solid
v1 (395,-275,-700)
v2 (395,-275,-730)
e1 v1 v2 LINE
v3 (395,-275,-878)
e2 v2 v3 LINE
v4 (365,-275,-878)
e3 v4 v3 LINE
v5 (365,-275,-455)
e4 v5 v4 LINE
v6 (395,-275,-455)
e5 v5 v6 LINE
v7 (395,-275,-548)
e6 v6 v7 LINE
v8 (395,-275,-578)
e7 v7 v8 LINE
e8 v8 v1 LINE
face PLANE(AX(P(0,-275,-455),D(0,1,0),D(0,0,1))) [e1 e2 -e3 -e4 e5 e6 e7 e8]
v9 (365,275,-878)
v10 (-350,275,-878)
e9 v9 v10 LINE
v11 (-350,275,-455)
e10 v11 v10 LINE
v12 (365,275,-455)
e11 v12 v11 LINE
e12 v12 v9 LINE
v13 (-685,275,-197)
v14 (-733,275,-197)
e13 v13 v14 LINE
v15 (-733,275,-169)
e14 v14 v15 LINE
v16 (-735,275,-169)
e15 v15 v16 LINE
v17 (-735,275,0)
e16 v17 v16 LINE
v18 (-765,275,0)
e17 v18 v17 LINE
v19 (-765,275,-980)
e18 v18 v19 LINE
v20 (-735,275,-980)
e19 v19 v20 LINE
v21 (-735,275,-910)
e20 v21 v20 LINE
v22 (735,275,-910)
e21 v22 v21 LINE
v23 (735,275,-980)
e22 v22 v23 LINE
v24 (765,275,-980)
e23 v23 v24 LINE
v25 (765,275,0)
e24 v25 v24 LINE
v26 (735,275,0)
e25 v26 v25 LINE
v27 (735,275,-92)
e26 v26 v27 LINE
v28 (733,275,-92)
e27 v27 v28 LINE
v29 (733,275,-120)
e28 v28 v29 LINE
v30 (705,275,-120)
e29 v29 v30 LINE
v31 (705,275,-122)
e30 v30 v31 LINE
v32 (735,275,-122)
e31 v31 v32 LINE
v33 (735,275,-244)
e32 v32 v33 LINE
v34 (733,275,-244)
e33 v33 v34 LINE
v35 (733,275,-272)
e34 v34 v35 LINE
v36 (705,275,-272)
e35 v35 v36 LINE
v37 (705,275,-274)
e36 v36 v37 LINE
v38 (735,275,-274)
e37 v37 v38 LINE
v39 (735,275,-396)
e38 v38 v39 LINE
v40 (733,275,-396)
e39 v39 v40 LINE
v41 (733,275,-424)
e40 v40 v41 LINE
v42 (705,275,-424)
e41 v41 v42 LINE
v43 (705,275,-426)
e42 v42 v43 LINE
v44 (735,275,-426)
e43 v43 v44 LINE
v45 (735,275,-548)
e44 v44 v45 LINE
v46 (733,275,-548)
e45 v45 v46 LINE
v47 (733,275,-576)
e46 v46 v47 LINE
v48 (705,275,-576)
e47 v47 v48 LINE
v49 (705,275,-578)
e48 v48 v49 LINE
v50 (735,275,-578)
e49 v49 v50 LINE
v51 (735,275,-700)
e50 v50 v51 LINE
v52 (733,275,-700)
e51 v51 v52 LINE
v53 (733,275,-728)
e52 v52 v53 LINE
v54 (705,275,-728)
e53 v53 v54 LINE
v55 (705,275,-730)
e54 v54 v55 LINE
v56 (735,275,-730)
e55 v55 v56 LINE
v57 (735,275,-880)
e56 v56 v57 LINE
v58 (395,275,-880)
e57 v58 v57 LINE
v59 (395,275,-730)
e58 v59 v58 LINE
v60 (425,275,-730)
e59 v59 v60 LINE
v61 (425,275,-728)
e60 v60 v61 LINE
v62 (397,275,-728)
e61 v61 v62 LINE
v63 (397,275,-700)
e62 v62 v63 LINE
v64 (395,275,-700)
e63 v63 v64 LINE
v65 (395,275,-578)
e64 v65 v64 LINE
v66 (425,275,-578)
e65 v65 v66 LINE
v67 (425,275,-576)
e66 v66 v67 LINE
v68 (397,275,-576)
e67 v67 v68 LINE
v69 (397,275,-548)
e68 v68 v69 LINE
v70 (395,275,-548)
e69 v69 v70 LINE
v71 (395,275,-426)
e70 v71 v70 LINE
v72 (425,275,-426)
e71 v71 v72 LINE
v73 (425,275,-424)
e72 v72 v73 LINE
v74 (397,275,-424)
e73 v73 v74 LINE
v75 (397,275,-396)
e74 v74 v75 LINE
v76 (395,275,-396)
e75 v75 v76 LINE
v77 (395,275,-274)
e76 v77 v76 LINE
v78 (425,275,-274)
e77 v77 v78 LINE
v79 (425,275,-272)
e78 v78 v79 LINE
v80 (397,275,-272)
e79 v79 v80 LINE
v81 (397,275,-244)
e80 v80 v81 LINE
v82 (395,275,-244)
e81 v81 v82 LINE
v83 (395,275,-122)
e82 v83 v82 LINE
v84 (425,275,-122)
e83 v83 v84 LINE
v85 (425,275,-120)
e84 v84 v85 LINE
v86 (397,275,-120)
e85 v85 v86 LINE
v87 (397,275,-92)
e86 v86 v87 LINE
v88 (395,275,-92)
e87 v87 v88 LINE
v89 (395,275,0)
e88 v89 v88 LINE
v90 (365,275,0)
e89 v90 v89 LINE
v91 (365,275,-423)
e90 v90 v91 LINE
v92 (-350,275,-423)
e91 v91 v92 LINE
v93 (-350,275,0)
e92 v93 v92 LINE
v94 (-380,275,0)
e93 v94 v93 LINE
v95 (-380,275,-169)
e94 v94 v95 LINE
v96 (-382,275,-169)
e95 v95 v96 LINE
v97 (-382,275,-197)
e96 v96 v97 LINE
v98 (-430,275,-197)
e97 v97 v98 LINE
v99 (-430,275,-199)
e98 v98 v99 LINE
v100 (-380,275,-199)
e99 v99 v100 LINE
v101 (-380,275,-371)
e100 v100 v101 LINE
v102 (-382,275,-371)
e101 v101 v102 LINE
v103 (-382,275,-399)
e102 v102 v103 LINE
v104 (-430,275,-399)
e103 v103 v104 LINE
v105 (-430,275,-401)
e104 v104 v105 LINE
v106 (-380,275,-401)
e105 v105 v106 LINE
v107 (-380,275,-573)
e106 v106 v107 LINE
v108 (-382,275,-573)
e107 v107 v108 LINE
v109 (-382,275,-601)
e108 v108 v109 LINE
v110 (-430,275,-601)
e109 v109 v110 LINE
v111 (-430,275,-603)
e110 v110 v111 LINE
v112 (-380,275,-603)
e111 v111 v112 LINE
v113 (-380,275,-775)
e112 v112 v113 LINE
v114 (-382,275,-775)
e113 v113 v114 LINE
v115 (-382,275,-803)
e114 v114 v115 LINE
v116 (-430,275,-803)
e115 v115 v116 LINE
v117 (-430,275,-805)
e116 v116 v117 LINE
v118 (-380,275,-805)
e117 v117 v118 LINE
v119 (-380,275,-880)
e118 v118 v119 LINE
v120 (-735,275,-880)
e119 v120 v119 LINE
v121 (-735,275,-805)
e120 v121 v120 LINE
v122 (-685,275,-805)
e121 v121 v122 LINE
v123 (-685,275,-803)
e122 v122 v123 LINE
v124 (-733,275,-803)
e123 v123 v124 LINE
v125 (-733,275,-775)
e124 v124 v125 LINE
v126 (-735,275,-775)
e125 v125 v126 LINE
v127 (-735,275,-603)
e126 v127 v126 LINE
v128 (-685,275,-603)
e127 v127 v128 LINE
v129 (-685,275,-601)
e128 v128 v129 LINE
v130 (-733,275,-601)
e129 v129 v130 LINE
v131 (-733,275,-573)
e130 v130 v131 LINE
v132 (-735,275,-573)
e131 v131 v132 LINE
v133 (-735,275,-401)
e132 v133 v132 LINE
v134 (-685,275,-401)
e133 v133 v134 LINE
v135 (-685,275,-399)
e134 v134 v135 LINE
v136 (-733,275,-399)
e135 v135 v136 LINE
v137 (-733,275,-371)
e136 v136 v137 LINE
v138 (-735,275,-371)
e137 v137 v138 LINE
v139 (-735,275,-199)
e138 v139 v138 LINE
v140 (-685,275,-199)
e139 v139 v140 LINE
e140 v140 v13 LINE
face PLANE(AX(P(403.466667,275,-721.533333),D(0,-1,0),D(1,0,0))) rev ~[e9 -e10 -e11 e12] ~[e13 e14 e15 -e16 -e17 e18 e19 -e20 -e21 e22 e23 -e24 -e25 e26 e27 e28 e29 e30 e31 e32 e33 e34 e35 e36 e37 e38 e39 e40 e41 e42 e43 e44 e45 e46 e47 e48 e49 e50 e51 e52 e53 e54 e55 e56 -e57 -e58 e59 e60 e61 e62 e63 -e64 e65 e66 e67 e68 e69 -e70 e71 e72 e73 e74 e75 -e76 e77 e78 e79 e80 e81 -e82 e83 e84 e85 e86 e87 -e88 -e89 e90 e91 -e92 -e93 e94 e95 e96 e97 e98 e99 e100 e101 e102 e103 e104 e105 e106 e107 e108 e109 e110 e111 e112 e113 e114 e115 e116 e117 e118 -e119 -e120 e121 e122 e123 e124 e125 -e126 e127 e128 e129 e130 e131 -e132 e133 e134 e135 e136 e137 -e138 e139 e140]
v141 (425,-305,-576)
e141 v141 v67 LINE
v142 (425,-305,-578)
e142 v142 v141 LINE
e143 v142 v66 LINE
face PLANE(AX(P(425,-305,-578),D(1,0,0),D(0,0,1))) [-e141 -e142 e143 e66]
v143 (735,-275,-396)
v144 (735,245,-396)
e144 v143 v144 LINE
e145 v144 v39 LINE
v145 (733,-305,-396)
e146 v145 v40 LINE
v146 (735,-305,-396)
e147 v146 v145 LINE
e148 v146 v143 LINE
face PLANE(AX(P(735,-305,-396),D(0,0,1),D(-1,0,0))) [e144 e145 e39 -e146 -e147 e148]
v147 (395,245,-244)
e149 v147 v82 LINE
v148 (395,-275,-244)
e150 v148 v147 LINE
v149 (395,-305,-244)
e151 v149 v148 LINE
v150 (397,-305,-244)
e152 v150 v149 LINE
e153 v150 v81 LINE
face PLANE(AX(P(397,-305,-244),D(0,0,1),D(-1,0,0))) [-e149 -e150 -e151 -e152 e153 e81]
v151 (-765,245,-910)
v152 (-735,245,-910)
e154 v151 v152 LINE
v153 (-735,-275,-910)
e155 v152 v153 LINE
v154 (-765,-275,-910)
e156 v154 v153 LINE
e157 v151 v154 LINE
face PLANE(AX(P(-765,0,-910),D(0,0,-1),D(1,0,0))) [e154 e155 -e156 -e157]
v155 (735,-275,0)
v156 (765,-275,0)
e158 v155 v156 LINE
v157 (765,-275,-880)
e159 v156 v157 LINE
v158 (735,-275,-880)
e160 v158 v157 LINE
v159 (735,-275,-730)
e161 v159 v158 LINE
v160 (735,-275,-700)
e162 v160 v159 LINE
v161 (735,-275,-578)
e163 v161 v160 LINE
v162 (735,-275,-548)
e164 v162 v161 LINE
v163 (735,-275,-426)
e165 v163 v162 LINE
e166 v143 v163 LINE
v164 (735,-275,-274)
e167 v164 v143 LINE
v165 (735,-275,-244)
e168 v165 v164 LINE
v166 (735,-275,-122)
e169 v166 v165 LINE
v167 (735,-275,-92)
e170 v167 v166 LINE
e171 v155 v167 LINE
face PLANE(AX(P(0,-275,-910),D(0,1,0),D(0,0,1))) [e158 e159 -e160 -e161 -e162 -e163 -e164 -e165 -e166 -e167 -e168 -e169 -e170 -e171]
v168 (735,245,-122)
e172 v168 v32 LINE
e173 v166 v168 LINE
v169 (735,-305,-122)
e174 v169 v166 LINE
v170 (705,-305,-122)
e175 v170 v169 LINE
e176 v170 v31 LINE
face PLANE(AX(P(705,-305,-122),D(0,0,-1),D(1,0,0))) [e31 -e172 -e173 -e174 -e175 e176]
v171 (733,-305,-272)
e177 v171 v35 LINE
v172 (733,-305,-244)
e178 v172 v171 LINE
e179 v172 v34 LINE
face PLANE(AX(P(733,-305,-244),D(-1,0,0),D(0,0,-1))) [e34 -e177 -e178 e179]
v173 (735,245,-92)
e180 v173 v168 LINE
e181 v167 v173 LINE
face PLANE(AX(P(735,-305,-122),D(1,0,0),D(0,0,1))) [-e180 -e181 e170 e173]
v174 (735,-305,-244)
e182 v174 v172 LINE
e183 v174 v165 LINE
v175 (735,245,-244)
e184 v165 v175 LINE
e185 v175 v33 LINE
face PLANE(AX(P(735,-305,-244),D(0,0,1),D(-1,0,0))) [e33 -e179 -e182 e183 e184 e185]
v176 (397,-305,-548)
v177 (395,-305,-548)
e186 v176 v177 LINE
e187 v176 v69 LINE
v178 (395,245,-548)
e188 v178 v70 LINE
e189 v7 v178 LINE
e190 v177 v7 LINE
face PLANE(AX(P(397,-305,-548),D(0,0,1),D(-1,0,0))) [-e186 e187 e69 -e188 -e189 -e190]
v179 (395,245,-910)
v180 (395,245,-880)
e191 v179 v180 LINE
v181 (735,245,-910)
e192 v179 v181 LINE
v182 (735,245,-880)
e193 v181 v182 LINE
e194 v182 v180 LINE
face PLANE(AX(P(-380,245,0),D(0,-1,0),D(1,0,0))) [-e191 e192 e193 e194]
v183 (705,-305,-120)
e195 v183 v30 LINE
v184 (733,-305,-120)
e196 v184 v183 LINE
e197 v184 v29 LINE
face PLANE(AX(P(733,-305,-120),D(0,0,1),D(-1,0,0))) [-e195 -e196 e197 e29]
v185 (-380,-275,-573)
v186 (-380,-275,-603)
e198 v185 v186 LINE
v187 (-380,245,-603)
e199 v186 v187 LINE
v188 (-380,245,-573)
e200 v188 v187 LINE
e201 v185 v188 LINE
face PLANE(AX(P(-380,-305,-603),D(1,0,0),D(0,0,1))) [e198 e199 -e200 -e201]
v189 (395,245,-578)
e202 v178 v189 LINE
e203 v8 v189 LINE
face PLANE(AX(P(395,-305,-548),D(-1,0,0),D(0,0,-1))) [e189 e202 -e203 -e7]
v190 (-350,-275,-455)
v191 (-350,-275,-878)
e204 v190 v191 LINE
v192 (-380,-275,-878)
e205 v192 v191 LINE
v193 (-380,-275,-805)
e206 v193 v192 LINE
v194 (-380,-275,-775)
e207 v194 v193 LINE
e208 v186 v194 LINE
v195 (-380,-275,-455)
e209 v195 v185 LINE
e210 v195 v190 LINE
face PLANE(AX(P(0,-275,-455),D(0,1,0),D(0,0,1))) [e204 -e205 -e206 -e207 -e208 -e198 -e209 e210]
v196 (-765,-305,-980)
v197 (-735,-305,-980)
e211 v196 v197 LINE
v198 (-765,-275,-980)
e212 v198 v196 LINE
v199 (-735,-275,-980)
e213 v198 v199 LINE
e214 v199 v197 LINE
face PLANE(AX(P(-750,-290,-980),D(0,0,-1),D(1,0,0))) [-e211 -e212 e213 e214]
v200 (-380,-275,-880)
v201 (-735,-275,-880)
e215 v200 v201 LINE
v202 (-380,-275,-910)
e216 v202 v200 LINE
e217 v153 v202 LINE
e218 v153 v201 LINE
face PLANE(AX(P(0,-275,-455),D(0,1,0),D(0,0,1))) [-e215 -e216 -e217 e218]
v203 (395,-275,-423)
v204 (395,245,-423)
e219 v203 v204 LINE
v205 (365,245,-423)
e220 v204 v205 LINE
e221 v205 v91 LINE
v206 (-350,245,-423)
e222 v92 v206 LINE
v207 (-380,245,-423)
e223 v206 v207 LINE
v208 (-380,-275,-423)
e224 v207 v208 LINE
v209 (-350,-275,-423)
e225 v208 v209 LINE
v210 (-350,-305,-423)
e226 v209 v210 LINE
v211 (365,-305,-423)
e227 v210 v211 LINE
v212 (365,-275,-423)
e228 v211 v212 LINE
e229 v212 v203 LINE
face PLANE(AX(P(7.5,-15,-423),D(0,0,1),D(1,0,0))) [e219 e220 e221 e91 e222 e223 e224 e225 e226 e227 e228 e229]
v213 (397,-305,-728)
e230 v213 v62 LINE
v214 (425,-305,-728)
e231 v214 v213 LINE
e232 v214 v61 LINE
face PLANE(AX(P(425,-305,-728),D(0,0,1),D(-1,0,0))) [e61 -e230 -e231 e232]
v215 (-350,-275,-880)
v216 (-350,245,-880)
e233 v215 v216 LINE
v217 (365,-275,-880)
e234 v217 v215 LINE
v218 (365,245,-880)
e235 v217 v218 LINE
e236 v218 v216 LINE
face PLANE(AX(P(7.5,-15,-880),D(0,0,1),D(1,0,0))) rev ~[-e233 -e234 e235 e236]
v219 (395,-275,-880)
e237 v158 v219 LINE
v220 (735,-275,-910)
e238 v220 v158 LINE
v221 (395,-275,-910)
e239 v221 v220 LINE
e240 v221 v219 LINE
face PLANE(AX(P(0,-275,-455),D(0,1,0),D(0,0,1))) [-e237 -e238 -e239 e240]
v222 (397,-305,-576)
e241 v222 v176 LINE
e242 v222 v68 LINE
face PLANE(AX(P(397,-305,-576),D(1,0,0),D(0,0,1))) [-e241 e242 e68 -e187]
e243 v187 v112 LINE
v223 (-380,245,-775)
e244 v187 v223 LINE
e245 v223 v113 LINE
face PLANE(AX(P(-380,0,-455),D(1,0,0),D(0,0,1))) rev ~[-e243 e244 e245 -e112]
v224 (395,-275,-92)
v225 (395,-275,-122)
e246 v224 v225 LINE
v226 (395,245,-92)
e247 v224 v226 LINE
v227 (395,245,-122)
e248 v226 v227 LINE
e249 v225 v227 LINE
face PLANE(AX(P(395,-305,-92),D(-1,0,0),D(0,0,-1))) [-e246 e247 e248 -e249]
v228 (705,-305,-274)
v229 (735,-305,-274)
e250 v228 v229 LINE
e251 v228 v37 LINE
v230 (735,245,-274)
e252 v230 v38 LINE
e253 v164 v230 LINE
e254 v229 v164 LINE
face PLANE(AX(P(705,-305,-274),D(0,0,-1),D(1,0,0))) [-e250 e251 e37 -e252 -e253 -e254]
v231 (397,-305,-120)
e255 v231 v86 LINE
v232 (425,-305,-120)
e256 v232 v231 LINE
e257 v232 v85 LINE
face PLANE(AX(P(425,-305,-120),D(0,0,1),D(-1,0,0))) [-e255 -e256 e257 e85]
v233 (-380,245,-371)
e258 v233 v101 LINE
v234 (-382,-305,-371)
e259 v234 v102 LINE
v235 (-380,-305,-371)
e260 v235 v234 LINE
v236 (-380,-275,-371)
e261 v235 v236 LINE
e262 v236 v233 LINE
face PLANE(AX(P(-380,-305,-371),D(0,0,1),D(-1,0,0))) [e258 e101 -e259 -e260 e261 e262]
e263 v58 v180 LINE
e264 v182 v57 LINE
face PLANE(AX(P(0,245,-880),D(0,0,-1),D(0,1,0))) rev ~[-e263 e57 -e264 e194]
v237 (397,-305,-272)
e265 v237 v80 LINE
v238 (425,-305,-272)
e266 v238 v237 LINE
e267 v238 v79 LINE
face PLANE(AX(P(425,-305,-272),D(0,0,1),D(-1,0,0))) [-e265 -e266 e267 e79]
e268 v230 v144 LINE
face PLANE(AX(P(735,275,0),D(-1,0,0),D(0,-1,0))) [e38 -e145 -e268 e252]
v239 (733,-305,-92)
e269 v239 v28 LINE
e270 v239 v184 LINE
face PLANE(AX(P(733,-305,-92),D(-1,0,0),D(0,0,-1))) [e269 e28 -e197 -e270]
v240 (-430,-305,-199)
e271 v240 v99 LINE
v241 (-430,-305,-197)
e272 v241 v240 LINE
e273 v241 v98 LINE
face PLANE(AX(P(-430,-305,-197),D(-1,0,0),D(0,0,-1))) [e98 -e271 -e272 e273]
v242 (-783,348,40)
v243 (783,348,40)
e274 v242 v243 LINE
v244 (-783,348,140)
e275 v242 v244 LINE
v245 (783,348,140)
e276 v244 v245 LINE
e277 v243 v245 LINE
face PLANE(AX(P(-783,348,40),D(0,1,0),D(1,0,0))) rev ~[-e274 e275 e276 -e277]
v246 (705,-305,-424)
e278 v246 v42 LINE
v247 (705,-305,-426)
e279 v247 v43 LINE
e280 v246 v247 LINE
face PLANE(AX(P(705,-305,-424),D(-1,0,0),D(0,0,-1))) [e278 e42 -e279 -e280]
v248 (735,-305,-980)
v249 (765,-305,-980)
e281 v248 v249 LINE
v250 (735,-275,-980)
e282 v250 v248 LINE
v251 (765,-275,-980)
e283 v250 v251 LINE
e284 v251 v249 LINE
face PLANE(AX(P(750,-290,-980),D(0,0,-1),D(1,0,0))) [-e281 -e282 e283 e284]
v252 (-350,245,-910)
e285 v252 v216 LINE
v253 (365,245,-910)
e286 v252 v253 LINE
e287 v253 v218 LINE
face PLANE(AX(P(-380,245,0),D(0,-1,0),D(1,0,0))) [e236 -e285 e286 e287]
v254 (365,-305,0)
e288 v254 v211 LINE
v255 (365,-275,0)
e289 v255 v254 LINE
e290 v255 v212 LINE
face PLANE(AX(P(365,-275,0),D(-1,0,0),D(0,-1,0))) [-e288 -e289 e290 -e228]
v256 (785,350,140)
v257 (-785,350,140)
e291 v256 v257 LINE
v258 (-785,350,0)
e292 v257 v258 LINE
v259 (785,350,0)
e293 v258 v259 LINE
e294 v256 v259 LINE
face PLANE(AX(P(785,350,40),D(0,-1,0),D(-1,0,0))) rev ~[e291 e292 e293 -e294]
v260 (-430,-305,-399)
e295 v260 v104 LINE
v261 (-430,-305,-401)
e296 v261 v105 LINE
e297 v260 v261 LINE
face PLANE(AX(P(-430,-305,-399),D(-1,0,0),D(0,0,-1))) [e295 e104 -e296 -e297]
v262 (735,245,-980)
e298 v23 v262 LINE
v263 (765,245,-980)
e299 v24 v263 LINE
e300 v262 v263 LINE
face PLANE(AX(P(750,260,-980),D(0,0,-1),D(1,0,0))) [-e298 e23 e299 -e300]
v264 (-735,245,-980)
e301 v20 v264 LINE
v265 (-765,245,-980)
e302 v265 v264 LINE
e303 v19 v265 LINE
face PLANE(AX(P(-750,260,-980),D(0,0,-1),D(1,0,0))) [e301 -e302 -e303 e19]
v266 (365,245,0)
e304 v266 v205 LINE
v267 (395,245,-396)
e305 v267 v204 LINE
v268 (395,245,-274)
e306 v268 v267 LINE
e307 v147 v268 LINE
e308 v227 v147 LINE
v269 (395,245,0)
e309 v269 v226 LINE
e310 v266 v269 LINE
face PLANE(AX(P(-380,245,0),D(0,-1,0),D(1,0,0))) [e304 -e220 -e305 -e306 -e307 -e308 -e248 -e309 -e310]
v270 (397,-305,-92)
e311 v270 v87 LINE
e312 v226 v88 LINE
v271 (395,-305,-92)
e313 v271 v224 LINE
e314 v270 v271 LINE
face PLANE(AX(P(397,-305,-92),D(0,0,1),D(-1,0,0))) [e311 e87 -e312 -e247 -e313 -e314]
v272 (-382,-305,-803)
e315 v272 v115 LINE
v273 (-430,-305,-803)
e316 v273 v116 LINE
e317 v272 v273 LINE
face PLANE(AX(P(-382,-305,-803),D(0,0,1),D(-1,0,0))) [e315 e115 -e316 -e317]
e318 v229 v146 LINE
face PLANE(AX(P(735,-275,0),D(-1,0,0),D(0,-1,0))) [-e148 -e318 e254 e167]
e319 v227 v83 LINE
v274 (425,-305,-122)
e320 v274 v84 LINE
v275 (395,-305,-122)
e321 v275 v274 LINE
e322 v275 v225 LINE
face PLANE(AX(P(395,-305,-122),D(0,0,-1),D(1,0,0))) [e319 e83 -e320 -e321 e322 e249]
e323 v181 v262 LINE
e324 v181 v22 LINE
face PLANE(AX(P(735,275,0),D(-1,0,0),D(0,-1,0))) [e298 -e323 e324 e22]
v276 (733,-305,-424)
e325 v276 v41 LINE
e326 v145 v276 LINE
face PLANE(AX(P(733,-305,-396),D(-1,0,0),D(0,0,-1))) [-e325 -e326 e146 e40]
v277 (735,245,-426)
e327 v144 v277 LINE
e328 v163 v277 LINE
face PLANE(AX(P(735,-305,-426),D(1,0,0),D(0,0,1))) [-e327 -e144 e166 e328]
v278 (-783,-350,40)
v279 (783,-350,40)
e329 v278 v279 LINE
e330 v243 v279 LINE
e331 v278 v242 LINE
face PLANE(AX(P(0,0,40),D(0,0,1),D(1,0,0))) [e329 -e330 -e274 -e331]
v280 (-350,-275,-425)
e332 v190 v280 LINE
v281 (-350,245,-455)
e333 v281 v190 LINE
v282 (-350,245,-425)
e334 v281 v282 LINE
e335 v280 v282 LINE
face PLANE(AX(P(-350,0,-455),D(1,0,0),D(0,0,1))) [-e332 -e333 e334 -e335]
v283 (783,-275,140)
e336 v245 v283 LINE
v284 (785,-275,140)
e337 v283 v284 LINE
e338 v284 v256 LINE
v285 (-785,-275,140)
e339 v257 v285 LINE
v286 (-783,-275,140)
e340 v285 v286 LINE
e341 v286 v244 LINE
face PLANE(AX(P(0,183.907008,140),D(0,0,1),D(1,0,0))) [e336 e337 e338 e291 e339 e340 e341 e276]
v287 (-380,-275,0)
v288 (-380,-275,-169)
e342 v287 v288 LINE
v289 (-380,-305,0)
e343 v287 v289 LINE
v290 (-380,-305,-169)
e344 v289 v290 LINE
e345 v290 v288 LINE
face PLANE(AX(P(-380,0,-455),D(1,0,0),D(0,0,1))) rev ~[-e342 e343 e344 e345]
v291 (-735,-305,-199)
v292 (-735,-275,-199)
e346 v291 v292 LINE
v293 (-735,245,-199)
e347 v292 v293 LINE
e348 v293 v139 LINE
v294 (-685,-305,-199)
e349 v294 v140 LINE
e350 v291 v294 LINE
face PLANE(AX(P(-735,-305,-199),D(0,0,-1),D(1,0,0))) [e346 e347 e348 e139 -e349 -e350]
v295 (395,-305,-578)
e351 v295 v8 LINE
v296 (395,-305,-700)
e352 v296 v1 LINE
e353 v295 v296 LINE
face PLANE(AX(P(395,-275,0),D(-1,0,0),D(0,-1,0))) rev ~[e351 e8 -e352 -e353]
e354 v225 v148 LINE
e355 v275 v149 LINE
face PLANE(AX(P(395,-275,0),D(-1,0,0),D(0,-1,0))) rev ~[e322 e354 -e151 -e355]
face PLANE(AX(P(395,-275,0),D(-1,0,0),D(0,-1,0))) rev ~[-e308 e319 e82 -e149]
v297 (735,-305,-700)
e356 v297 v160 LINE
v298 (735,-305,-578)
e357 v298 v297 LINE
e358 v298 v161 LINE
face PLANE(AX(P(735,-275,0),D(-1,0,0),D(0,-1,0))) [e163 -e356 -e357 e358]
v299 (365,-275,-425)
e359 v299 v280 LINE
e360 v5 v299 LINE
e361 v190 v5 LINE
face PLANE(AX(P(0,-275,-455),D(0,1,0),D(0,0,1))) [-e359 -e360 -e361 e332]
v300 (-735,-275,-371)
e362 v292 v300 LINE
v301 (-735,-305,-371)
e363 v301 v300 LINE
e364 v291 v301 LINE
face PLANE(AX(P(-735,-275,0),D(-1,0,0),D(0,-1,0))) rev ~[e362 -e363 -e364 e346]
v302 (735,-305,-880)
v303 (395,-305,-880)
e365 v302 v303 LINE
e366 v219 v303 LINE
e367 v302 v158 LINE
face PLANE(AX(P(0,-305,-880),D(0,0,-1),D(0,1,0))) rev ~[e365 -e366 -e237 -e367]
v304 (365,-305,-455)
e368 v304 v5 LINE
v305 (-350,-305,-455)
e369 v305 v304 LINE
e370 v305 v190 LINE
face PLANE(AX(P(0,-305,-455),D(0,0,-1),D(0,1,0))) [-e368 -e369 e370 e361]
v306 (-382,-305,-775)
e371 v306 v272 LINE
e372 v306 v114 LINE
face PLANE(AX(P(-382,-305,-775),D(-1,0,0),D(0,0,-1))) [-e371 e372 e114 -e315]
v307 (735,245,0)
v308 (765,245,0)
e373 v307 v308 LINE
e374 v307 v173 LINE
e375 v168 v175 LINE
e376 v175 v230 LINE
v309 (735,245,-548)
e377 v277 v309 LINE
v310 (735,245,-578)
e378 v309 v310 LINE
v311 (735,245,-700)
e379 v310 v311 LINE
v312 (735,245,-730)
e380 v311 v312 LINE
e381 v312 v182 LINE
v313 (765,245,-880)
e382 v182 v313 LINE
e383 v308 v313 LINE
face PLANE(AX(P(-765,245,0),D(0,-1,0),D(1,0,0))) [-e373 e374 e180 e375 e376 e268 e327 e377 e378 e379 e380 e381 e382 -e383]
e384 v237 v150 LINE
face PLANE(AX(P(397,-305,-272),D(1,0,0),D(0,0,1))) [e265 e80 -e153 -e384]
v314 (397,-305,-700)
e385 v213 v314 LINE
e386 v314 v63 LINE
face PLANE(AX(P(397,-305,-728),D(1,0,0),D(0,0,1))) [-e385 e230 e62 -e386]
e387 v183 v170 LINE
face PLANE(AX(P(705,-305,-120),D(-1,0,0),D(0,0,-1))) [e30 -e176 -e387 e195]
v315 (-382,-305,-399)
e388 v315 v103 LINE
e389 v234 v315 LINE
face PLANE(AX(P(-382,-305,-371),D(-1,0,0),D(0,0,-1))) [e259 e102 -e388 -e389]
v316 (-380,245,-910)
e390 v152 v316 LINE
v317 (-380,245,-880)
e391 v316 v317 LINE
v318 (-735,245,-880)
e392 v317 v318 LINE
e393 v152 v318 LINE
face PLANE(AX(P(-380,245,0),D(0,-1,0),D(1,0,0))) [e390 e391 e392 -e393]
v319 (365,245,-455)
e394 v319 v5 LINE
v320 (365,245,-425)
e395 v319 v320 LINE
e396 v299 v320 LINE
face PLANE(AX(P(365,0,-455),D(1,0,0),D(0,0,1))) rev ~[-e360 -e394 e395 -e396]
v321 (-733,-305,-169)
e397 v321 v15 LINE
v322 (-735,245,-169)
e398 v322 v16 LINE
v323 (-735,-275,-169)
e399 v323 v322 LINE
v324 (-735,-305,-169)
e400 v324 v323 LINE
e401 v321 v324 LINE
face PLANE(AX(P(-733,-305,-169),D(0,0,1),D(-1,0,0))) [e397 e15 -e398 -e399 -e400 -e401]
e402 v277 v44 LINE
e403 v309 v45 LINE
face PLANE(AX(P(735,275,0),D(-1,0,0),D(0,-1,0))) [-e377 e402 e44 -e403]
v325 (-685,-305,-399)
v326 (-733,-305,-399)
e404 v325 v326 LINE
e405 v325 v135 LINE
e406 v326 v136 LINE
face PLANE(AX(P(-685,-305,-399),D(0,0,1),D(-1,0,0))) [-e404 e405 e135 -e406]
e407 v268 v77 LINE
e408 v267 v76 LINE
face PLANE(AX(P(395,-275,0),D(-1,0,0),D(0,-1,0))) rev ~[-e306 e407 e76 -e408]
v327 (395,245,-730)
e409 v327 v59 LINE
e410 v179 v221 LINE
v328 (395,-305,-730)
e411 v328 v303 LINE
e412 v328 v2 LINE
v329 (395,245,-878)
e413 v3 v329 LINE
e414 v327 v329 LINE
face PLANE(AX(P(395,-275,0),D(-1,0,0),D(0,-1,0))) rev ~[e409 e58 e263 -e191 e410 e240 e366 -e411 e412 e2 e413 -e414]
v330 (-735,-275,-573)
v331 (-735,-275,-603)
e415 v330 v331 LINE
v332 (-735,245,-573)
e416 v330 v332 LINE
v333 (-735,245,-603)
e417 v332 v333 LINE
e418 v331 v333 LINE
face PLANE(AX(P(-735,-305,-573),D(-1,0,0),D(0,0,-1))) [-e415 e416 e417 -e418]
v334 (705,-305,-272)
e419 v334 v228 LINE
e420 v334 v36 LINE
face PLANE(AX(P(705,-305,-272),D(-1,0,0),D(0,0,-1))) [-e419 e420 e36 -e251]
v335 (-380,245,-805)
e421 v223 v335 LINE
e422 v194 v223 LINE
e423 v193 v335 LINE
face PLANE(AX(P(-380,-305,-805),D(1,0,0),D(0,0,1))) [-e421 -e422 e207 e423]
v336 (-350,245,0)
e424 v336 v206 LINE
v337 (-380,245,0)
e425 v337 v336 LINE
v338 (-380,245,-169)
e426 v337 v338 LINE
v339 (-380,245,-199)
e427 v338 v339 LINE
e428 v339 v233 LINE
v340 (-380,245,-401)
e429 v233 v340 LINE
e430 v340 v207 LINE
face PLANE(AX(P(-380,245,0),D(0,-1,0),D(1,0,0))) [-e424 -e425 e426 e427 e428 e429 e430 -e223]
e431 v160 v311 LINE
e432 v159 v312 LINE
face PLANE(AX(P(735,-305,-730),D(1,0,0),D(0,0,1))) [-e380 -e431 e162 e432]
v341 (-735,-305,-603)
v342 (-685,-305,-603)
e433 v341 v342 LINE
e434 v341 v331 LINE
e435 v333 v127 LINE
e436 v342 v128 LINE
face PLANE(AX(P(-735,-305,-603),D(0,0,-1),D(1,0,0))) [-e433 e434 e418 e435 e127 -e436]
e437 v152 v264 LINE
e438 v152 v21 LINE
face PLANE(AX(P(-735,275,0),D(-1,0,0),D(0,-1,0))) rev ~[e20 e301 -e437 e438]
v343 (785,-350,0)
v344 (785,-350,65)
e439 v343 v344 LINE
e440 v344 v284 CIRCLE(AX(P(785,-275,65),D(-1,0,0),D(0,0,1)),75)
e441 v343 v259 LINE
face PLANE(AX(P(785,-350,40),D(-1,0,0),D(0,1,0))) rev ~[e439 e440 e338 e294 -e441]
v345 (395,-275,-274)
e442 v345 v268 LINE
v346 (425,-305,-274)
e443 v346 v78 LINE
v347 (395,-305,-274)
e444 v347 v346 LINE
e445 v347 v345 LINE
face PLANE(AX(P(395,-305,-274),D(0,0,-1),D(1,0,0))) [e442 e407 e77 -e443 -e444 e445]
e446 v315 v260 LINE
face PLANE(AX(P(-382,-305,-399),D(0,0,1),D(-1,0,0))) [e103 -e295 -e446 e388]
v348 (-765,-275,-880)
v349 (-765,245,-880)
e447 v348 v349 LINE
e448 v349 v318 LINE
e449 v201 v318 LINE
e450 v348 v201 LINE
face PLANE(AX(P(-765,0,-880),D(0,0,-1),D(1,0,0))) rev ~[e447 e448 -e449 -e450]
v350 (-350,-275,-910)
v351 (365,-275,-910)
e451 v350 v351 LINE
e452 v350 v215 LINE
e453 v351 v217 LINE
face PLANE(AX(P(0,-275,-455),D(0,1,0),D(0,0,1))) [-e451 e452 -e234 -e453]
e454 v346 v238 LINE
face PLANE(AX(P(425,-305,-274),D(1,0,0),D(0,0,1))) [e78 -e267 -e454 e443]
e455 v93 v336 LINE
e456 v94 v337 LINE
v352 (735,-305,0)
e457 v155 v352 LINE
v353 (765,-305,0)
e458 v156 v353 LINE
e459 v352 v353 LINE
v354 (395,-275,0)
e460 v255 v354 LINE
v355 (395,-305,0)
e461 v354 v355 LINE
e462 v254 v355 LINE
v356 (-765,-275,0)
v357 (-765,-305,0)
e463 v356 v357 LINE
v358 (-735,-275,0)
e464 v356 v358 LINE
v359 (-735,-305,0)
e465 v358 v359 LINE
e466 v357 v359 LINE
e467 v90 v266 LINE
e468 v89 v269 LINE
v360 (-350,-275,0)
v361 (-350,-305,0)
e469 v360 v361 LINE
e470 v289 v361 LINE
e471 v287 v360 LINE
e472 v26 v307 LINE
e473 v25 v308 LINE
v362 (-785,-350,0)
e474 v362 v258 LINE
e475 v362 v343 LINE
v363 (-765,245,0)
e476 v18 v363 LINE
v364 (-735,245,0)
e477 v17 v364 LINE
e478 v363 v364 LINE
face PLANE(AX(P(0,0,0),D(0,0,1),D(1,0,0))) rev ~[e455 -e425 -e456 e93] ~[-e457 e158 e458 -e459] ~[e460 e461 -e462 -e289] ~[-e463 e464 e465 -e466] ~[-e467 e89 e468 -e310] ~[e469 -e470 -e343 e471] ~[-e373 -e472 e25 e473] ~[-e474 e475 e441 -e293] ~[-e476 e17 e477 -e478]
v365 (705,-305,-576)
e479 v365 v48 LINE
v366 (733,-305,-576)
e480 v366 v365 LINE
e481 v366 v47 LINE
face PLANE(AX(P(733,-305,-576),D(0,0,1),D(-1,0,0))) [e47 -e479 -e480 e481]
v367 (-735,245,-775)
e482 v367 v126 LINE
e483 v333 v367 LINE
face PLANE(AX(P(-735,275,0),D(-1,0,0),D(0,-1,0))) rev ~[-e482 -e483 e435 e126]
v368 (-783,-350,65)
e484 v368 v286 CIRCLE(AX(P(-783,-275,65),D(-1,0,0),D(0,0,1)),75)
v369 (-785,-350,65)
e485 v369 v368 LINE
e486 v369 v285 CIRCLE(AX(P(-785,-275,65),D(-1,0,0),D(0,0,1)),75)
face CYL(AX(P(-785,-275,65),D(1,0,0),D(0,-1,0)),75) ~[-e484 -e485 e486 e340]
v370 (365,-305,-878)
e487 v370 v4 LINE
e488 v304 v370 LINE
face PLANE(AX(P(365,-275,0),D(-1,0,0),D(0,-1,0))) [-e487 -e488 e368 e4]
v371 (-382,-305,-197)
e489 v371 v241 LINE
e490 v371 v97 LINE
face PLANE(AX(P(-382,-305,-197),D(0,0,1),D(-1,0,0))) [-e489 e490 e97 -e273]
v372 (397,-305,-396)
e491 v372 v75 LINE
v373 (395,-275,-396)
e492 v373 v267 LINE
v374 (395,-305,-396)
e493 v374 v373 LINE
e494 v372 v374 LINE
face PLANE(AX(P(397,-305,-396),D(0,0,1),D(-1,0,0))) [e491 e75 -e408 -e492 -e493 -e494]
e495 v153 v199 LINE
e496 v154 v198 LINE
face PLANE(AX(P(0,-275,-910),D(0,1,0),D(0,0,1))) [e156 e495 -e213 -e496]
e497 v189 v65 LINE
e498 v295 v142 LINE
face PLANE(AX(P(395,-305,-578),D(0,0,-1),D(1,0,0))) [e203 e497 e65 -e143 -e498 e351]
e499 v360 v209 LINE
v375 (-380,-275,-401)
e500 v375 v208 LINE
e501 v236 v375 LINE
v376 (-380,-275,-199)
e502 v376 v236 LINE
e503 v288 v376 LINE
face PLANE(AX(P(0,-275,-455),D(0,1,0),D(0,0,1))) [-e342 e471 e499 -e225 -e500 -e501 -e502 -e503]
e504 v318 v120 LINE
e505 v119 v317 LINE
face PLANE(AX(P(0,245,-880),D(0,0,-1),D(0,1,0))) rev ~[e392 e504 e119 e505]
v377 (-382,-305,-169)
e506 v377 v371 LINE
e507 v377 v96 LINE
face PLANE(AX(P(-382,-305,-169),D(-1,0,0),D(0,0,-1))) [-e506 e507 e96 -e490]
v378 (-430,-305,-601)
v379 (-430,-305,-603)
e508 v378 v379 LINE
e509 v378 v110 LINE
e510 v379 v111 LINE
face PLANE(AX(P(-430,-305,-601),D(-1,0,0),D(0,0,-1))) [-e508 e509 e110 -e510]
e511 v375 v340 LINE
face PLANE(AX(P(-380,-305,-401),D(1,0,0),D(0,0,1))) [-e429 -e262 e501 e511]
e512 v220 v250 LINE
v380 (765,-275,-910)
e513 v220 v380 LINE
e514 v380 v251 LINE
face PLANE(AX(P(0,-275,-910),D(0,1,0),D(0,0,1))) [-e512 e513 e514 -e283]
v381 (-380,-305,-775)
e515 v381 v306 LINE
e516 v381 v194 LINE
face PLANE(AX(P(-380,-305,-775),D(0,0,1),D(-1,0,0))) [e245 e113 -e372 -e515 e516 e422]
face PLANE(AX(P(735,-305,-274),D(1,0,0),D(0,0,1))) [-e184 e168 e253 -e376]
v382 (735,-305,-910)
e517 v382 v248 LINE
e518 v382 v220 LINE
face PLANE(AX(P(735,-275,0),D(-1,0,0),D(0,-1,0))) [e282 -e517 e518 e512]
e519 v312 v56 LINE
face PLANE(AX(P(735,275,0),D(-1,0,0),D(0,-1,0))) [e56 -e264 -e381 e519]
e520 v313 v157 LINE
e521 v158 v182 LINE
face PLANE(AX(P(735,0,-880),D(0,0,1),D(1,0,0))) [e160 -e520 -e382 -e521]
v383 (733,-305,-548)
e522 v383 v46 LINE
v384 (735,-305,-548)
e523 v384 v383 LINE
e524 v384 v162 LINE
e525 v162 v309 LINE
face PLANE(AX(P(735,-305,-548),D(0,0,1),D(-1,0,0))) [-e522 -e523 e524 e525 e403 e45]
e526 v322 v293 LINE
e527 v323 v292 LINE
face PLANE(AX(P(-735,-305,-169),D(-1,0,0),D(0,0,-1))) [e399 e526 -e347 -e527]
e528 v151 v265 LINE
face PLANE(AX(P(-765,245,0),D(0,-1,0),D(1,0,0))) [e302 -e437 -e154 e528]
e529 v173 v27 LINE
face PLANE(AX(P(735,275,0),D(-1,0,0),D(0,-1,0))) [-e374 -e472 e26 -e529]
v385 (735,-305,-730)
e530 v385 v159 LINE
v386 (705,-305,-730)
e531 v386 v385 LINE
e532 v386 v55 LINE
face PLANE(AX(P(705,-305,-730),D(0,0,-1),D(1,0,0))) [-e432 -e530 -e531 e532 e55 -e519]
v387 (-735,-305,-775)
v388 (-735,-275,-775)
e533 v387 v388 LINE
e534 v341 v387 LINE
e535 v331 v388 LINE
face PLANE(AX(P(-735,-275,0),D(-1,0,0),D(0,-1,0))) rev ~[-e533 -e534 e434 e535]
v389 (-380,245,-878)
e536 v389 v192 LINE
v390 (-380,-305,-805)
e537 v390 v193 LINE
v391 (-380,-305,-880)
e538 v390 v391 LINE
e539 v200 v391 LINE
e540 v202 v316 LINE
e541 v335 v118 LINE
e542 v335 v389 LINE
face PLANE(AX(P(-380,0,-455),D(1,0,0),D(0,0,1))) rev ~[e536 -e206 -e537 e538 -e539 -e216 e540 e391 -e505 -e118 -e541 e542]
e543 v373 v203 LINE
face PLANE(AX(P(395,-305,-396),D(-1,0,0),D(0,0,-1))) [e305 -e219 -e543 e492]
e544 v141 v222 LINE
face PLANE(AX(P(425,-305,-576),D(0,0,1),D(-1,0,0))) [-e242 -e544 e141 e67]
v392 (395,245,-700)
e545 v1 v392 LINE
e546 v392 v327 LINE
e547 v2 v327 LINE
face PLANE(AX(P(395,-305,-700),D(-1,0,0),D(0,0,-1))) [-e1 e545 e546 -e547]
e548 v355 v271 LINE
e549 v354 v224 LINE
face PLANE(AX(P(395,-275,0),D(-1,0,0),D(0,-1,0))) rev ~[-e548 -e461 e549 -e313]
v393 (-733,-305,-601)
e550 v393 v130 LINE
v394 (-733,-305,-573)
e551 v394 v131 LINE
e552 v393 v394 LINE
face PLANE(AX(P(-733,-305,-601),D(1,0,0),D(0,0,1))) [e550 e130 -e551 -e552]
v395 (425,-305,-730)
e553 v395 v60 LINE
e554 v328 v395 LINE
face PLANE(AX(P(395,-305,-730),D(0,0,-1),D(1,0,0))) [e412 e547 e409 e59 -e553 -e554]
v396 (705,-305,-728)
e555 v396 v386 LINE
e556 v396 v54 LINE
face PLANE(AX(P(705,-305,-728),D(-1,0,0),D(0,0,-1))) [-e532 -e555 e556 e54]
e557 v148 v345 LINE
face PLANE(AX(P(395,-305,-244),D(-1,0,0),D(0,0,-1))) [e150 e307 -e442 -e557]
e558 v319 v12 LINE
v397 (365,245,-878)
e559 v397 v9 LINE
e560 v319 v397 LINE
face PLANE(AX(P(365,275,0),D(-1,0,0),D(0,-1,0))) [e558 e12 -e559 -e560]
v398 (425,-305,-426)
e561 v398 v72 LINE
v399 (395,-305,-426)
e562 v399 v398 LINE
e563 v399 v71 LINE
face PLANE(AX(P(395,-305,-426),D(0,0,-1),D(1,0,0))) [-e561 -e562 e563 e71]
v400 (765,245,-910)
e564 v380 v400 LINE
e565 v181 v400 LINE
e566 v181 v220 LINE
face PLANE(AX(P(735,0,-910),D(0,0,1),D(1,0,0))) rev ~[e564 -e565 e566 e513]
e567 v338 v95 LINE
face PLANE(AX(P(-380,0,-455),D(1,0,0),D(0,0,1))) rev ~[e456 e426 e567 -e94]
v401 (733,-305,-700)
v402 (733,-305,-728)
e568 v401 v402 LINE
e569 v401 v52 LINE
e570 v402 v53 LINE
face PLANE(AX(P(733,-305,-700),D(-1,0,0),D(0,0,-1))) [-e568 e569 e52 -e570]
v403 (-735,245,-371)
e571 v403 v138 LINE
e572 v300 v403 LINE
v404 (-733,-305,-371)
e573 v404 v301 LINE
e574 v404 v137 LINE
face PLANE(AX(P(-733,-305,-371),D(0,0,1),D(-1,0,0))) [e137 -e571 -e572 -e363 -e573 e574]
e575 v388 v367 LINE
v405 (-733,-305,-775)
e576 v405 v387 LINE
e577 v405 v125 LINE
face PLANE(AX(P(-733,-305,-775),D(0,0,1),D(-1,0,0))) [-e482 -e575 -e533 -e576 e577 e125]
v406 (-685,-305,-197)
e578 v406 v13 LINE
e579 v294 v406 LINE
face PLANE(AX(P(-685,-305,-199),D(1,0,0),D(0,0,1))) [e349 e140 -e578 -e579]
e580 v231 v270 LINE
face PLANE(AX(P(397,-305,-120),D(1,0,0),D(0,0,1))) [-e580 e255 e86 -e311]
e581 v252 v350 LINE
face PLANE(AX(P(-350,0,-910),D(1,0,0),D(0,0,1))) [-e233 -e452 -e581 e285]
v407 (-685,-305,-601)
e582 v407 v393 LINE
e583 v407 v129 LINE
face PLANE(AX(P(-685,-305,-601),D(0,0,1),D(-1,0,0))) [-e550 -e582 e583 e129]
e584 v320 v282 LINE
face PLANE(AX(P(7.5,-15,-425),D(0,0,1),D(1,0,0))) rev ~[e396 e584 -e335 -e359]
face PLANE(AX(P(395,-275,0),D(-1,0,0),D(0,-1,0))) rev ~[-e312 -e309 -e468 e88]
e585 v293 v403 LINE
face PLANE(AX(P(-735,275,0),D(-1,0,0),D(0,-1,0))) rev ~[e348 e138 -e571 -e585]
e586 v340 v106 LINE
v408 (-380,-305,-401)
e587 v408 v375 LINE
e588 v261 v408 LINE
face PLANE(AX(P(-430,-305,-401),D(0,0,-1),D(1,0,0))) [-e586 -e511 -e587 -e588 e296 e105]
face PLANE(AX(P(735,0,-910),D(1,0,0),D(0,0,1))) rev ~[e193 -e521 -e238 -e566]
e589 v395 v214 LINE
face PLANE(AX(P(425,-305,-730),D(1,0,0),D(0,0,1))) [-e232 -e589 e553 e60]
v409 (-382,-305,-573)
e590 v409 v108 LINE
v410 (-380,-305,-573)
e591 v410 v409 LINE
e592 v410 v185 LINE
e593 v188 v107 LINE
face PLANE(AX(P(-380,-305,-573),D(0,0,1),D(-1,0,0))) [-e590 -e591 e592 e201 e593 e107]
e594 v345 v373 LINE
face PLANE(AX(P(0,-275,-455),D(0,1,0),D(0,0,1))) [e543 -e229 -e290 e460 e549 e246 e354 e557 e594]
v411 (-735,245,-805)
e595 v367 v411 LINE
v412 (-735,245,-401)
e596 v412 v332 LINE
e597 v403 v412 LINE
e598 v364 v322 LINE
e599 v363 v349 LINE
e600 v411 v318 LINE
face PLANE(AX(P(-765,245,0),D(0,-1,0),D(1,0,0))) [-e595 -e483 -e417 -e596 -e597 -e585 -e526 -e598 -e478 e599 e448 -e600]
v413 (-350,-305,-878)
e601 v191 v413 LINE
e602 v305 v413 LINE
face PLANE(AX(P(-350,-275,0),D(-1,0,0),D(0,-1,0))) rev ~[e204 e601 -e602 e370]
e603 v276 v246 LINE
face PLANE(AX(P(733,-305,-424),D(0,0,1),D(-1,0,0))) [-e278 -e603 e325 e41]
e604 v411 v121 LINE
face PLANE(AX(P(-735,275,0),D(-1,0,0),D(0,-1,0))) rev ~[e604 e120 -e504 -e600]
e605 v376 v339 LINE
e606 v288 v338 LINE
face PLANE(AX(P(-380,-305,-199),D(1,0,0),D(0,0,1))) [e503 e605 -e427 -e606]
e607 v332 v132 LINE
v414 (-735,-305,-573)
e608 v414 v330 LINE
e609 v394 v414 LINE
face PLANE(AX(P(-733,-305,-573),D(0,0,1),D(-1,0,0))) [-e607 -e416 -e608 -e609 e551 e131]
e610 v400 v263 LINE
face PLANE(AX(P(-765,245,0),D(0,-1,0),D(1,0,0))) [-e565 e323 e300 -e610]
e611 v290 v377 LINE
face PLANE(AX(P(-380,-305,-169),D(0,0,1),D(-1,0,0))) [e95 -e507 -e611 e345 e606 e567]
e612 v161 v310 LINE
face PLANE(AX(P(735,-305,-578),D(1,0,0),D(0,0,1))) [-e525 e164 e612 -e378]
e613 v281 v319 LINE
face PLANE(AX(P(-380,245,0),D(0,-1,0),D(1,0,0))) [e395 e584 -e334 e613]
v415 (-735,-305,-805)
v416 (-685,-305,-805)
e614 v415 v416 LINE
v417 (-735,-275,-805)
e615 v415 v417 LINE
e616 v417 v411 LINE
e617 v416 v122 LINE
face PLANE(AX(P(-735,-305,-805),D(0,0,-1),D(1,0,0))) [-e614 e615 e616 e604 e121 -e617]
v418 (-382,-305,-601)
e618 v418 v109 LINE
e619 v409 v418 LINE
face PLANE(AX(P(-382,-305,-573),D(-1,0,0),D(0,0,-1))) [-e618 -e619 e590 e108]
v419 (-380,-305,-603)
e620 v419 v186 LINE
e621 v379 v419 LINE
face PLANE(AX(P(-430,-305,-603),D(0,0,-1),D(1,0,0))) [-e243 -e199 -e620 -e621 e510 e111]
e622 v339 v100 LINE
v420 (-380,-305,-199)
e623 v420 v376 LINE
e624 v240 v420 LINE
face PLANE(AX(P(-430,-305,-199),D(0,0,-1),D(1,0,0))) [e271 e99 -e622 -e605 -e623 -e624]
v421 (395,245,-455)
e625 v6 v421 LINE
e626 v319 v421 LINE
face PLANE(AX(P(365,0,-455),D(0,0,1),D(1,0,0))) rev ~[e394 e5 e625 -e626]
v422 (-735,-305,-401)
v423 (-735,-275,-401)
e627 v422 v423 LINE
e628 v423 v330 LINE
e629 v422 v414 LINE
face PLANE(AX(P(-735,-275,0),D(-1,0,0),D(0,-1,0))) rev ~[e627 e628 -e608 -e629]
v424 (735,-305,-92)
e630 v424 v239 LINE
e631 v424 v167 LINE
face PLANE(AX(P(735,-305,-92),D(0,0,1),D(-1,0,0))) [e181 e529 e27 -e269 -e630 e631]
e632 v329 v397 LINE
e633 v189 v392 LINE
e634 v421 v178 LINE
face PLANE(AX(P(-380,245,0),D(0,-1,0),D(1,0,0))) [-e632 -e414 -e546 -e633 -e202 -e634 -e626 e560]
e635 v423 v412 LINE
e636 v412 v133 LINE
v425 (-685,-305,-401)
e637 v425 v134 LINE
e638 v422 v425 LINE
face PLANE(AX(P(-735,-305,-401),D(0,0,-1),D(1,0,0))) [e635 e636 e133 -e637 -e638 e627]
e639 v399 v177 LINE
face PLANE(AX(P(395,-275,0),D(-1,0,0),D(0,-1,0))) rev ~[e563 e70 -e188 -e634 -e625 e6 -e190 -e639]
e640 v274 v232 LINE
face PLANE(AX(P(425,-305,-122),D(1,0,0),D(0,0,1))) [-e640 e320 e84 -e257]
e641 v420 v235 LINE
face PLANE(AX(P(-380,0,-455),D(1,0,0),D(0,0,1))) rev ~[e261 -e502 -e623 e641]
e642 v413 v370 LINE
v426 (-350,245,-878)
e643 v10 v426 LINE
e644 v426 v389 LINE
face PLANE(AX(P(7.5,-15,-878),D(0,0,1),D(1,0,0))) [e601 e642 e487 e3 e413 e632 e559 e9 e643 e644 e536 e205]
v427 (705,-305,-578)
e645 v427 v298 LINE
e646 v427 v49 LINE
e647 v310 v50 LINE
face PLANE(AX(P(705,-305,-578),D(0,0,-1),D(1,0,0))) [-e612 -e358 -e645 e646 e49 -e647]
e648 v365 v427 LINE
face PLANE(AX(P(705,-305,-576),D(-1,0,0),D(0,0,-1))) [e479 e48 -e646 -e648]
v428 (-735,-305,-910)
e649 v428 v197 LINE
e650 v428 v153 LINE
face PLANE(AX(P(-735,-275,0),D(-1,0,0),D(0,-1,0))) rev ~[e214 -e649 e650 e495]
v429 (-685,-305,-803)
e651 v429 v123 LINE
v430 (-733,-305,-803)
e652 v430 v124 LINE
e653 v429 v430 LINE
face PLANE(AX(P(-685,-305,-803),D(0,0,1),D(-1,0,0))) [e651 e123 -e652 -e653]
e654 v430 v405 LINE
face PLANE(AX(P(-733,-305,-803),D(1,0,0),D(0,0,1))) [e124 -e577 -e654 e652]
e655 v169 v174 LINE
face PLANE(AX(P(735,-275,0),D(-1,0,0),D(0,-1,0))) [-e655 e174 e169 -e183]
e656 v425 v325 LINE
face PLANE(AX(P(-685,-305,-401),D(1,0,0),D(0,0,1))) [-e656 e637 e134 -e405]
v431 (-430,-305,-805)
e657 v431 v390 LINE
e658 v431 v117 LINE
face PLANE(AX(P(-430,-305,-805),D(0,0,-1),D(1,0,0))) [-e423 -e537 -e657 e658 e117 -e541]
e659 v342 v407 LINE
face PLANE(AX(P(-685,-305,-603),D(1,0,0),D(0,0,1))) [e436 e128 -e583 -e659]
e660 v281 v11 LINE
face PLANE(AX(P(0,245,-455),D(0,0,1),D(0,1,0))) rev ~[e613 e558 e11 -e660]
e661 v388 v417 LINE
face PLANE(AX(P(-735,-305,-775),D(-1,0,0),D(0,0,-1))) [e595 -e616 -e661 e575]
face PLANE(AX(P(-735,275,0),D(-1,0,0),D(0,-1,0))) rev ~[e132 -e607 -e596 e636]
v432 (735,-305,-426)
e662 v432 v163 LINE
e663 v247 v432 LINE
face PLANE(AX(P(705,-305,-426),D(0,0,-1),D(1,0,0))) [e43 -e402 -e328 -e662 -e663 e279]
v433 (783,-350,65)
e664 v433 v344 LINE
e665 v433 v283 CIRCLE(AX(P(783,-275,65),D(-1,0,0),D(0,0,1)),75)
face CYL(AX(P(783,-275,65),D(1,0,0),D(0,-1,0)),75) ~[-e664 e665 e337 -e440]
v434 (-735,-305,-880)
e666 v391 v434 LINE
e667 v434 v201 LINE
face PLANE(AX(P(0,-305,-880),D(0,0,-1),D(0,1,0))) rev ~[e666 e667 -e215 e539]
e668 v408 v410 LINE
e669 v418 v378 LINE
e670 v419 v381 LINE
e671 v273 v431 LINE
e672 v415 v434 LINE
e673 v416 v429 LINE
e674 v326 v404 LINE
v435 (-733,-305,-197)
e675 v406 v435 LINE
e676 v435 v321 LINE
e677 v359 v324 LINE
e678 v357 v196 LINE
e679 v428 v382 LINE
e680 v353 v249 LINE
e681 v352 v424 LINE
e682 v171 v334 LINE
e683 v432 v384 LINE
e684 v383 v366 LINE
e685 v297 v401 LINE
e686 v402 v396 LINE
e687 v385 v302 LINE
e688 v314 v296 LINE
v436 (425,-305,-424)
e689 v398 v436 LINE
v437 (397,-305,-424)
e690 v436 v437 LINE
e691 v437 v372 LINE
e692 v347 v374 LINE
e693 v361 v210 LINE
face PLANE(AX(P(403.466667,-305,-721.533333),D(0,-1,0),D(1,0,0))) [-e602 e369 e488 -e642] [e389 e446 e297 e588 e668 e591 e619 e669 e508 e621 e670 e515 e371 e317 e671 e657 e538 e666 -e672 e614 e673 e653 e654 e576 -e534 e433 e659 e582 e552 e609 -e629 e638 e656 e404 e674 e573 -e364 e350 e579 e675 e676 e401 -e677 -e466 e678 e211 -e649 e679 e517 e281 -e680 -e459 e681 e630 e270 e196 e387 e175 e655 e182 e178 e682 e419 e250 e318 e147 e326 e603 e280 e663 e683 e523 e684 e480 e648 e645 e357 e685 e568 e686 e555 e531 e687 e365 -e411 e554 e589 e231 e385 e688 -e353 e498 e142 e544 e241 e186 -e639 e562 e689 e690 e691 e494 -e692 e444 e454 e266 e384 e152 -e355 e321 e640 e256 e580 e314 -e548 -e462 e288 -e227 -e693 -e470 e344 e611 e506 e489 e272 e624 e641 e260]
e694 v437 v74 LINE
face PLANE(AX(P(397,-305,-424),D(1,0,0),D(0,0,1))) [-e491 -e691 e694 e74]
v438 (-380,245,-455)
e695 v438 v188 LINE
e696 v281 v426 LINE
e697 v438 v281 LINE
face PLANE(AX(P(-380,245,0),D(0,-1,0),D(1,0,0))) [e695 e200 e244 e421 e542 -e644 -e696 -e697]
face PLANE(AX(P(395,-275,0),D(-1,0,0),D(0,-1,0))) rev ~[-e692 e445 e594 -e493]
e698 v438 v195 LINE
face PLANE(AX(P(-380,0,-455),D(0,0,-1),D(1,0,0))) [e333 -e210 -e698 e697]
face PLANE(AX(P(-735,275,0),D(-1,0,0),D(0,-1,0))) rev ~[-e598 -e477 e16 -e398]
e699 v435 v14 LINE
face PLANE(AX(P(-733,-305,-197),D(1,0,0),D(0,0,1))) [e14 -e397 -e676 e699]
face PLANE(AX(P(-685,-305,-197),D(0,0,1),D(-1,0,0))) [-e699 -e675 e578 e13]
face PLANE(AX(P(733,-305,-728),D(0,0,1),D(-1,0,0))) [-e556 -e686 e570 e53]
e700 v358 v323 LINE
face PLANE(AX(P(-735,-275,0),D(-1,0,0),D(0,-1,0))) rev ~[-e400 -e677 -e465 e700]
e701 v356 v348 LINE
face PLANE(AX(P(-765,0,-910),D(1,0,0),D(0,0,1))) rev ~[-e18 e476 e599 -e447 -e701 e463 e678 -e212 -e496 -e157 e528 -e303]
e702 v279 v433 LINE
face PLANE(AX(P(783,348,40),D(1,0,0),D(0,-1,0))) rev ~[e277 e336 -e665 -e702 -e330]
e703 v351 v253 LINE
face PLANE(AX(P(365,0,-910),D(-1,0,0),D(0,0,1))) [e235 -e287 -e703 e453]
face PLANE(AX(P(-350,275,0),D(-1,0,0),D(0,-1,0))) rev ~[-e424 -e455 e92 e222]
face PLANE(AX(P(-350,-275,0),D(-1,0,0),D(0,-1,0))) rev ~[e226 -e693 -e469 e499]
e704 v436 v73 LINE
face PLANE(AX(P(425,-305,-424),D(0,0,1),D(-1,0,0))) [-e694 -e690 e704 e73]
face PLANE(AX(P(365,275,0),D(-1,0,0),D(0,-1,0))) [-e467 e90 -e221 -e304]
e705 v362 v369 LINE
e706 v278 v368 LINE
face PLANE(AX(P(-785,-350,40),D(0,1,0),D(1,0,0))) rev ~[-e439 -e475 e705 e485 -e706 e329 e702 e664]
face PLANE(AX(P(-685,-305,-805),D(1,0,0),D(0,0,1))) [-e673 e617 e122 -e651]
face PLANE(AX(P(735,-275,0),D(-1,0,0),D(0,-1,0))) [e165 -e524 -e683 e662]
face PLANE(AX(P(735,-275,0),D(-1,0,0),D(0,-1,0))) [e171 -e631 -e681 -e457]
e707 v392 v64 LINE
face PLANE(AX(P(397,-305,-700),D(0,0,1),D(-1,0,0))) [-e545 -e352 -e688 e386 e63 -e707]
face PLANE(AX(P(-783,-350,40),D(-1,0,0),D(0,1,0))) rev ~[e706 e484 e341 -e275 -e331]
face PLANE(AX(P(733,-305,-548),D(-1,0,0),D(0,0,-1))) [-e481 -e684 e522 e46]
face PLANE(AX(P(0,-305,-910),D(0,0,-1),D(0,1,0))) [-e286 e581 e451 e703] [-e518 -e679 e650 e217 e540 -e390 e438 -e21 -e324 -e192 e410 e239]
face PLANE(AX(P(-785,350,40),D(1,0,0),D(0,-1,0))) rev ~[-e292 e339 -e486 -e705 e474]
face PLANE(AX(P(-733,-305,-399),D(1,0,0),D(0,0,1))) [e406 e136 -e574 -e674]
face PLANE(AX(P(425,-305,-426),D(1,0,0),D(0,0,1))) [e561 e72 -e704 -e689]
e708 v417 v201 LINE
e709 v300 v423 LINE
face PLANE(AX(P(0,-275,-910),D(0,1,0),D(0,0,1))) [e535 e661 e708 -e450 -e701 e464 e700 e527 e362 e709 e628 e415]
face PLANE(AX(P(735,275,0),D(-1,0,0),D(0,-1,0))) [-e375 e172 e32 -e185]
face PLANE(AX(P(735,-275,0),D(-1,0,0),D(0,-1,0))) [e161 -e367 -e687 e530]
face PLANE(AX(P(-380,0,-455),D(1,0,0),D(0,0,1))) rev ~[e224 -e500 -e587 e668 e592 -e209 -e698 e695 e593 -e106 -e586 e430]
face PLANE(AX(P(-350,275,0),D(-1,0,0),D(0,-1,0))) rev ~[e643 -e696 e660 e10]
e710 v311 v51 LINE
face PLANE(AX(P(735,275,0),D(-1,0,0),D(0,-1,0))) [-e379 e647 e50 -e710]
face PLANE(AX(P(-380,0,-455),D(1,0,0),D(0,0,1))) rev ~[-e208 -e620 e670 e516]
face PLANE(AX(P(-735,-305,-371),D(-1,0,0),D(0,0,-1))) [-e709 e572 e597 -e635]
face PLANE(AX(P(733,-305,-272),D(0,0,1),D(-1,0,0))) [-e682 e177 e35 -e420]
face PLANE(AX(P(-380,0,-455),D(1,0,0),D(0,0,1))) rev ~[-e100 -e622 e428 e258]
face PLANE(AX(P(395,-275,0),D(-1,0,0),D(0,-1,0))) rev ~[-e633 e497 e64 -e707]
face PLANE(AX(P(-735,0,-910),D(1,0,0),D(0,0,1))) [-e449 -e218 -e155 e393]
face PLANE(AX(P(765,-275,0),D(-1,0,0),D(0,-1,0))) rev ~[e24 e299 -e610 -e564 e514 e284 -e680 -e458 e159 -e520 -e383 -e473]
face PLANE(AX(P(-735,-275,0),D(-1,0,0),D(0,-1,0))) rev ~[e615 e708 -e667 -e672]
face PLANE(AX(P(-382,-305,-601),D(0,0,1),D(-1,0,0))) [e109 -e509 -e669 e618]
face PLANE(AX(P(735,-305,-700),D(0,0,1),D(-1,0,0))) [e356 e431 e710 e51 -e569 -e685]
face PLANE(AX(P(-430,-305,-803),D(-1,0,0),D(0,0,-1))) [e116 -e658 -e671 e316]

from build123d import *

# Parameters (mm, degrees)
F0_W           = 1570
F0_H           = 700
F1_DEPTH       = 40
F3_DEPTH       = 100
F4_R           = 75
F5_W           = 30
F5_H           = 30
F6_DEPTH       = 980
F7_W           = 30
F7_H           = 30
F8_DEPTH       = 735
F8_DEPTH_BACK  = 735
F9_W           = 30
F9_H           = 30
F10_DEPTH      = 275
F10_DEPTH_BACK = 245
F11_W          = 30
F11_H          = 30
F12_DEPTH      = 880
F13_W          = 30
F13_H          = 30
F14_DEPTH      = 365
F14_DEPTH_BACK = 350
F15_W          = 30
F15_H          = 30
F16_DEPTH      = 275
F16_DEPTH_BACK = 245
F18_DEPTH      = 2
F20_DEPTH      = 2
F22_DEPTH      = 580
F24_DEPTH      = 580


with BuildPart() as f1:
    # F0 (on Top) → F1 (new body)
    with BuildSketch(Plane.XY):
        Rectangle(F0_W, F0_H)
    extrude(amount=F1_DEPTH)

    # F2 (on face) → F3 (join)
    with BuildSketch(Plane.XY.offset(40)):
        Polygon((-785, 350), (-785, -350), (-783, -350), (-783, 348), (783, 348), (783, -350), (785, -350), (785, 350), align=None)
    extrude(amount=F3_DEPTH)

    # F4
    f4_edges = [f1.edges().sort_by_distance(p)[0] for p in [
        (-784, -350, 140),
        (784, -350, 140),
    ]]
    fillet(f4_edges, radius=F4_R)

    # F5 (on face) → F6 (join)
    with BuildSketch(Plane(origin=(0, 0, 0), x_dir=(1, 0, 0), z_dir=(0, 0, -1))):
        with Locations((-750, 290)):
            Rectangle(F5_W, F5_H)
        with Locations((750, 290)):
            Rectangle(F5_W, F5_H)
        with Locations((750, -260)):
            Rectangle(F5_W, F5_H)
        with Locations((-750, -260)):
            Rectangle(F5_W, F5_H)
    extrude(amount=F6_DEPTH)

    # F7 (on Right) → F8 (join, two sides)
    with BuildSketch(Plane.YZ) as f8_sk:
        with Locations((-290, -895)):
            Rectangle(F7_W, F7_H)
        with Locations((260, -895)):
            Rectangle(F7_W, F7_H)
    extrude(amount=F8_DEPTH)
    extrude(f8_sk.sketch, amount=-F8_DEPTH_BACK)

    # F9 (on Front) → F10 (join, two sides)
    with BuildSketch(Plane.XZ) as f10_sk:
        with Locations((-750, -895)):
            Rectangle(F9_W, F9_H)
        with Locations((750, -895)):
            Rectangle(F9_W, F9_H)
    extrude(amount=F10_DEPTH)
    extrude(f10_sk.sketch, amount=-F10_DEPTH_BACK)

    # F11 (on face) → F12 (join, through all)
    with BuildSketch(Plane(origin=(0, 0, 0), x_dir=(1, 0, 0), z_dir=(0, 0, -1))):
        with Locations((-365, 290)):
            Rectangle(F11_W, F11_H)
        with Locations((380, 290)):
            Rectangle(F11_W, F11_H)
        with Locations((380, -260)):
            Rectangle(F11_W, F11_H)
        with Locations((-365, -260)):
            Rectangle(F11_W, F11_H)
    extrude(amount=F12_DEPTH)

    # F13 (on Right) → F14 (join, two sides)
    with BuildSketch(Plane.YZ) as f14_sk:
        with Locations((-290, -440)):
            Rectangle(F13_W, F13_H)
        with Locations((260, -440)):
            Rectangle(F13_W, F13_H)
    extrude(amount=F14_DEPTH)
    extrude(f14_sk.sketch, amount=-F14_DEPTH_BACK)

    # F15 (on Front) → F16 (join, two sides)
    with BuildSketch(Plane.XZ) as f16_sk:
        with Locations((-365, -440)):
            Rectangle(F15_W, F15_H)
        with Locations((380, -440)):
            Rectangle(F15_W, F15_H)
        with Locations((380, -895)):
            Rectangle(F15_W, F15_H)
        with Locations((-365, -895)):
            Rectangle(F15_W, F15_H)
    extrude(amount=F16_DEPTH)
    extrude(f16_sk.sketch, amount=-F16_DEPTH_BACK)

    # F17 (on face) → F18 (join)
    with BuildSketch(Plane.XY.offset(-425)):
        Polygon((365, 245), (365, 275), (-350, 275), (-350, 245), (-380, 245), (-380, -275), (-350, -275), (-350, -305), (365, -305), (365, -275), (395, -275), (395, 245), align=None)
    extrude(amount=F18_DEPTH)

    # F19 (on face) → F20 (join)
    with BuildSketch(Plane.XY.offset(-880)):
        Polygon((365, 245), (365, 275), (-350, 275), (-350, 245), (-380, 245), (-380, -275), (-350, -275), (-350, -305), (365, -305), (365, -275), (395, -275), (395, 245), align=None)
    extrude(amount=F20_DEPTH)

    # F21 (on face) → F22 (join, through all)
    with BuildSketch(Plane.XZ.offset(305)):
        Polygon((-733, -775), (-735, -775), (-735, -805), (-685, -805), (-685, -803), (-733, -803), align=None)
        Polygon((-735, -573), (-735, -603), (-685, -603), (-685, -601), (-733, -601), (-733, -573), align=None)
        Polygon((-735, -371), (-735, -401), (-685, -401), (-685, -399), (-733, -399), (-733, -371), align=None)
        Polygon((-735, -169), (-735, -199), (-685, -199), (-685, -197), (-733, -197), (-733, -169), align=None)
        Polygon((-430, -803), (-430, -805), (-380, -805), (-380, -775), (-382, -775), (-382, -803), align=None)
        Polygon((-430, -601), (-430, -603), (-380, -603), (-380, -573), (-382, -573), (-382, -601), align=None)
        Polygon((-430, -399), (-430, -401), (-380, -401), (-380, -371), (-382, -371), (-382, -399), align=None)
        Polygon((-380, -169), (-382, -169), (-382, -197), (-430, -197), (-430, -199), (-380, -199), align=None)
    extrude(amount=-F22_DEPTH)

    # F23 (on face) → F24 (join, through all)
    with BuildSketch(Plane.XZ.offset(305)):
        Polygon((397, -700), (395, -700), (395, -730), (425, -730), (425, -728), (397, -728), align=None)
        Polygon((397, -548), (395, -548), (395, -578), (425, -578), (425, -576), (397, -576), align=None)
        Polygon((397, -396), (395, -396), (395, -426), (425, -426), (425, -424), (397, -424), align=None)
        Polygon((397, -244), (395, -244), (395, -274), (425, -274), (425, -272), (397, -272), align=None)
        Polygon((397, -92), (395, -92), (395, -122), (425, -122), (425, -120), (397, -120), align=None)
        Polygon((735, -244), (733, -244), (733, -272), (705, -272), (705, -274), (735, -274), align=None)
        Polygon((735, -92), (733, -92), (733, -120), (705, -120), (705, -122), (735, -122), align=None)
        Polygon((705, -424), (705, -426), (735, -426), (735, -396), (733, -396), (733, -424), align=None)
        Polygon((705, -730), (735, -730), (735, -700), (733, -700), (733, -728), (705, -728), align=None)
        Polygon((735, -578), (735, -548), (733, -548), (733, -576), (705, -576), (705, -578), align=None)
    extrude(amount=-F24_DEPTH)


solid = f1.part
